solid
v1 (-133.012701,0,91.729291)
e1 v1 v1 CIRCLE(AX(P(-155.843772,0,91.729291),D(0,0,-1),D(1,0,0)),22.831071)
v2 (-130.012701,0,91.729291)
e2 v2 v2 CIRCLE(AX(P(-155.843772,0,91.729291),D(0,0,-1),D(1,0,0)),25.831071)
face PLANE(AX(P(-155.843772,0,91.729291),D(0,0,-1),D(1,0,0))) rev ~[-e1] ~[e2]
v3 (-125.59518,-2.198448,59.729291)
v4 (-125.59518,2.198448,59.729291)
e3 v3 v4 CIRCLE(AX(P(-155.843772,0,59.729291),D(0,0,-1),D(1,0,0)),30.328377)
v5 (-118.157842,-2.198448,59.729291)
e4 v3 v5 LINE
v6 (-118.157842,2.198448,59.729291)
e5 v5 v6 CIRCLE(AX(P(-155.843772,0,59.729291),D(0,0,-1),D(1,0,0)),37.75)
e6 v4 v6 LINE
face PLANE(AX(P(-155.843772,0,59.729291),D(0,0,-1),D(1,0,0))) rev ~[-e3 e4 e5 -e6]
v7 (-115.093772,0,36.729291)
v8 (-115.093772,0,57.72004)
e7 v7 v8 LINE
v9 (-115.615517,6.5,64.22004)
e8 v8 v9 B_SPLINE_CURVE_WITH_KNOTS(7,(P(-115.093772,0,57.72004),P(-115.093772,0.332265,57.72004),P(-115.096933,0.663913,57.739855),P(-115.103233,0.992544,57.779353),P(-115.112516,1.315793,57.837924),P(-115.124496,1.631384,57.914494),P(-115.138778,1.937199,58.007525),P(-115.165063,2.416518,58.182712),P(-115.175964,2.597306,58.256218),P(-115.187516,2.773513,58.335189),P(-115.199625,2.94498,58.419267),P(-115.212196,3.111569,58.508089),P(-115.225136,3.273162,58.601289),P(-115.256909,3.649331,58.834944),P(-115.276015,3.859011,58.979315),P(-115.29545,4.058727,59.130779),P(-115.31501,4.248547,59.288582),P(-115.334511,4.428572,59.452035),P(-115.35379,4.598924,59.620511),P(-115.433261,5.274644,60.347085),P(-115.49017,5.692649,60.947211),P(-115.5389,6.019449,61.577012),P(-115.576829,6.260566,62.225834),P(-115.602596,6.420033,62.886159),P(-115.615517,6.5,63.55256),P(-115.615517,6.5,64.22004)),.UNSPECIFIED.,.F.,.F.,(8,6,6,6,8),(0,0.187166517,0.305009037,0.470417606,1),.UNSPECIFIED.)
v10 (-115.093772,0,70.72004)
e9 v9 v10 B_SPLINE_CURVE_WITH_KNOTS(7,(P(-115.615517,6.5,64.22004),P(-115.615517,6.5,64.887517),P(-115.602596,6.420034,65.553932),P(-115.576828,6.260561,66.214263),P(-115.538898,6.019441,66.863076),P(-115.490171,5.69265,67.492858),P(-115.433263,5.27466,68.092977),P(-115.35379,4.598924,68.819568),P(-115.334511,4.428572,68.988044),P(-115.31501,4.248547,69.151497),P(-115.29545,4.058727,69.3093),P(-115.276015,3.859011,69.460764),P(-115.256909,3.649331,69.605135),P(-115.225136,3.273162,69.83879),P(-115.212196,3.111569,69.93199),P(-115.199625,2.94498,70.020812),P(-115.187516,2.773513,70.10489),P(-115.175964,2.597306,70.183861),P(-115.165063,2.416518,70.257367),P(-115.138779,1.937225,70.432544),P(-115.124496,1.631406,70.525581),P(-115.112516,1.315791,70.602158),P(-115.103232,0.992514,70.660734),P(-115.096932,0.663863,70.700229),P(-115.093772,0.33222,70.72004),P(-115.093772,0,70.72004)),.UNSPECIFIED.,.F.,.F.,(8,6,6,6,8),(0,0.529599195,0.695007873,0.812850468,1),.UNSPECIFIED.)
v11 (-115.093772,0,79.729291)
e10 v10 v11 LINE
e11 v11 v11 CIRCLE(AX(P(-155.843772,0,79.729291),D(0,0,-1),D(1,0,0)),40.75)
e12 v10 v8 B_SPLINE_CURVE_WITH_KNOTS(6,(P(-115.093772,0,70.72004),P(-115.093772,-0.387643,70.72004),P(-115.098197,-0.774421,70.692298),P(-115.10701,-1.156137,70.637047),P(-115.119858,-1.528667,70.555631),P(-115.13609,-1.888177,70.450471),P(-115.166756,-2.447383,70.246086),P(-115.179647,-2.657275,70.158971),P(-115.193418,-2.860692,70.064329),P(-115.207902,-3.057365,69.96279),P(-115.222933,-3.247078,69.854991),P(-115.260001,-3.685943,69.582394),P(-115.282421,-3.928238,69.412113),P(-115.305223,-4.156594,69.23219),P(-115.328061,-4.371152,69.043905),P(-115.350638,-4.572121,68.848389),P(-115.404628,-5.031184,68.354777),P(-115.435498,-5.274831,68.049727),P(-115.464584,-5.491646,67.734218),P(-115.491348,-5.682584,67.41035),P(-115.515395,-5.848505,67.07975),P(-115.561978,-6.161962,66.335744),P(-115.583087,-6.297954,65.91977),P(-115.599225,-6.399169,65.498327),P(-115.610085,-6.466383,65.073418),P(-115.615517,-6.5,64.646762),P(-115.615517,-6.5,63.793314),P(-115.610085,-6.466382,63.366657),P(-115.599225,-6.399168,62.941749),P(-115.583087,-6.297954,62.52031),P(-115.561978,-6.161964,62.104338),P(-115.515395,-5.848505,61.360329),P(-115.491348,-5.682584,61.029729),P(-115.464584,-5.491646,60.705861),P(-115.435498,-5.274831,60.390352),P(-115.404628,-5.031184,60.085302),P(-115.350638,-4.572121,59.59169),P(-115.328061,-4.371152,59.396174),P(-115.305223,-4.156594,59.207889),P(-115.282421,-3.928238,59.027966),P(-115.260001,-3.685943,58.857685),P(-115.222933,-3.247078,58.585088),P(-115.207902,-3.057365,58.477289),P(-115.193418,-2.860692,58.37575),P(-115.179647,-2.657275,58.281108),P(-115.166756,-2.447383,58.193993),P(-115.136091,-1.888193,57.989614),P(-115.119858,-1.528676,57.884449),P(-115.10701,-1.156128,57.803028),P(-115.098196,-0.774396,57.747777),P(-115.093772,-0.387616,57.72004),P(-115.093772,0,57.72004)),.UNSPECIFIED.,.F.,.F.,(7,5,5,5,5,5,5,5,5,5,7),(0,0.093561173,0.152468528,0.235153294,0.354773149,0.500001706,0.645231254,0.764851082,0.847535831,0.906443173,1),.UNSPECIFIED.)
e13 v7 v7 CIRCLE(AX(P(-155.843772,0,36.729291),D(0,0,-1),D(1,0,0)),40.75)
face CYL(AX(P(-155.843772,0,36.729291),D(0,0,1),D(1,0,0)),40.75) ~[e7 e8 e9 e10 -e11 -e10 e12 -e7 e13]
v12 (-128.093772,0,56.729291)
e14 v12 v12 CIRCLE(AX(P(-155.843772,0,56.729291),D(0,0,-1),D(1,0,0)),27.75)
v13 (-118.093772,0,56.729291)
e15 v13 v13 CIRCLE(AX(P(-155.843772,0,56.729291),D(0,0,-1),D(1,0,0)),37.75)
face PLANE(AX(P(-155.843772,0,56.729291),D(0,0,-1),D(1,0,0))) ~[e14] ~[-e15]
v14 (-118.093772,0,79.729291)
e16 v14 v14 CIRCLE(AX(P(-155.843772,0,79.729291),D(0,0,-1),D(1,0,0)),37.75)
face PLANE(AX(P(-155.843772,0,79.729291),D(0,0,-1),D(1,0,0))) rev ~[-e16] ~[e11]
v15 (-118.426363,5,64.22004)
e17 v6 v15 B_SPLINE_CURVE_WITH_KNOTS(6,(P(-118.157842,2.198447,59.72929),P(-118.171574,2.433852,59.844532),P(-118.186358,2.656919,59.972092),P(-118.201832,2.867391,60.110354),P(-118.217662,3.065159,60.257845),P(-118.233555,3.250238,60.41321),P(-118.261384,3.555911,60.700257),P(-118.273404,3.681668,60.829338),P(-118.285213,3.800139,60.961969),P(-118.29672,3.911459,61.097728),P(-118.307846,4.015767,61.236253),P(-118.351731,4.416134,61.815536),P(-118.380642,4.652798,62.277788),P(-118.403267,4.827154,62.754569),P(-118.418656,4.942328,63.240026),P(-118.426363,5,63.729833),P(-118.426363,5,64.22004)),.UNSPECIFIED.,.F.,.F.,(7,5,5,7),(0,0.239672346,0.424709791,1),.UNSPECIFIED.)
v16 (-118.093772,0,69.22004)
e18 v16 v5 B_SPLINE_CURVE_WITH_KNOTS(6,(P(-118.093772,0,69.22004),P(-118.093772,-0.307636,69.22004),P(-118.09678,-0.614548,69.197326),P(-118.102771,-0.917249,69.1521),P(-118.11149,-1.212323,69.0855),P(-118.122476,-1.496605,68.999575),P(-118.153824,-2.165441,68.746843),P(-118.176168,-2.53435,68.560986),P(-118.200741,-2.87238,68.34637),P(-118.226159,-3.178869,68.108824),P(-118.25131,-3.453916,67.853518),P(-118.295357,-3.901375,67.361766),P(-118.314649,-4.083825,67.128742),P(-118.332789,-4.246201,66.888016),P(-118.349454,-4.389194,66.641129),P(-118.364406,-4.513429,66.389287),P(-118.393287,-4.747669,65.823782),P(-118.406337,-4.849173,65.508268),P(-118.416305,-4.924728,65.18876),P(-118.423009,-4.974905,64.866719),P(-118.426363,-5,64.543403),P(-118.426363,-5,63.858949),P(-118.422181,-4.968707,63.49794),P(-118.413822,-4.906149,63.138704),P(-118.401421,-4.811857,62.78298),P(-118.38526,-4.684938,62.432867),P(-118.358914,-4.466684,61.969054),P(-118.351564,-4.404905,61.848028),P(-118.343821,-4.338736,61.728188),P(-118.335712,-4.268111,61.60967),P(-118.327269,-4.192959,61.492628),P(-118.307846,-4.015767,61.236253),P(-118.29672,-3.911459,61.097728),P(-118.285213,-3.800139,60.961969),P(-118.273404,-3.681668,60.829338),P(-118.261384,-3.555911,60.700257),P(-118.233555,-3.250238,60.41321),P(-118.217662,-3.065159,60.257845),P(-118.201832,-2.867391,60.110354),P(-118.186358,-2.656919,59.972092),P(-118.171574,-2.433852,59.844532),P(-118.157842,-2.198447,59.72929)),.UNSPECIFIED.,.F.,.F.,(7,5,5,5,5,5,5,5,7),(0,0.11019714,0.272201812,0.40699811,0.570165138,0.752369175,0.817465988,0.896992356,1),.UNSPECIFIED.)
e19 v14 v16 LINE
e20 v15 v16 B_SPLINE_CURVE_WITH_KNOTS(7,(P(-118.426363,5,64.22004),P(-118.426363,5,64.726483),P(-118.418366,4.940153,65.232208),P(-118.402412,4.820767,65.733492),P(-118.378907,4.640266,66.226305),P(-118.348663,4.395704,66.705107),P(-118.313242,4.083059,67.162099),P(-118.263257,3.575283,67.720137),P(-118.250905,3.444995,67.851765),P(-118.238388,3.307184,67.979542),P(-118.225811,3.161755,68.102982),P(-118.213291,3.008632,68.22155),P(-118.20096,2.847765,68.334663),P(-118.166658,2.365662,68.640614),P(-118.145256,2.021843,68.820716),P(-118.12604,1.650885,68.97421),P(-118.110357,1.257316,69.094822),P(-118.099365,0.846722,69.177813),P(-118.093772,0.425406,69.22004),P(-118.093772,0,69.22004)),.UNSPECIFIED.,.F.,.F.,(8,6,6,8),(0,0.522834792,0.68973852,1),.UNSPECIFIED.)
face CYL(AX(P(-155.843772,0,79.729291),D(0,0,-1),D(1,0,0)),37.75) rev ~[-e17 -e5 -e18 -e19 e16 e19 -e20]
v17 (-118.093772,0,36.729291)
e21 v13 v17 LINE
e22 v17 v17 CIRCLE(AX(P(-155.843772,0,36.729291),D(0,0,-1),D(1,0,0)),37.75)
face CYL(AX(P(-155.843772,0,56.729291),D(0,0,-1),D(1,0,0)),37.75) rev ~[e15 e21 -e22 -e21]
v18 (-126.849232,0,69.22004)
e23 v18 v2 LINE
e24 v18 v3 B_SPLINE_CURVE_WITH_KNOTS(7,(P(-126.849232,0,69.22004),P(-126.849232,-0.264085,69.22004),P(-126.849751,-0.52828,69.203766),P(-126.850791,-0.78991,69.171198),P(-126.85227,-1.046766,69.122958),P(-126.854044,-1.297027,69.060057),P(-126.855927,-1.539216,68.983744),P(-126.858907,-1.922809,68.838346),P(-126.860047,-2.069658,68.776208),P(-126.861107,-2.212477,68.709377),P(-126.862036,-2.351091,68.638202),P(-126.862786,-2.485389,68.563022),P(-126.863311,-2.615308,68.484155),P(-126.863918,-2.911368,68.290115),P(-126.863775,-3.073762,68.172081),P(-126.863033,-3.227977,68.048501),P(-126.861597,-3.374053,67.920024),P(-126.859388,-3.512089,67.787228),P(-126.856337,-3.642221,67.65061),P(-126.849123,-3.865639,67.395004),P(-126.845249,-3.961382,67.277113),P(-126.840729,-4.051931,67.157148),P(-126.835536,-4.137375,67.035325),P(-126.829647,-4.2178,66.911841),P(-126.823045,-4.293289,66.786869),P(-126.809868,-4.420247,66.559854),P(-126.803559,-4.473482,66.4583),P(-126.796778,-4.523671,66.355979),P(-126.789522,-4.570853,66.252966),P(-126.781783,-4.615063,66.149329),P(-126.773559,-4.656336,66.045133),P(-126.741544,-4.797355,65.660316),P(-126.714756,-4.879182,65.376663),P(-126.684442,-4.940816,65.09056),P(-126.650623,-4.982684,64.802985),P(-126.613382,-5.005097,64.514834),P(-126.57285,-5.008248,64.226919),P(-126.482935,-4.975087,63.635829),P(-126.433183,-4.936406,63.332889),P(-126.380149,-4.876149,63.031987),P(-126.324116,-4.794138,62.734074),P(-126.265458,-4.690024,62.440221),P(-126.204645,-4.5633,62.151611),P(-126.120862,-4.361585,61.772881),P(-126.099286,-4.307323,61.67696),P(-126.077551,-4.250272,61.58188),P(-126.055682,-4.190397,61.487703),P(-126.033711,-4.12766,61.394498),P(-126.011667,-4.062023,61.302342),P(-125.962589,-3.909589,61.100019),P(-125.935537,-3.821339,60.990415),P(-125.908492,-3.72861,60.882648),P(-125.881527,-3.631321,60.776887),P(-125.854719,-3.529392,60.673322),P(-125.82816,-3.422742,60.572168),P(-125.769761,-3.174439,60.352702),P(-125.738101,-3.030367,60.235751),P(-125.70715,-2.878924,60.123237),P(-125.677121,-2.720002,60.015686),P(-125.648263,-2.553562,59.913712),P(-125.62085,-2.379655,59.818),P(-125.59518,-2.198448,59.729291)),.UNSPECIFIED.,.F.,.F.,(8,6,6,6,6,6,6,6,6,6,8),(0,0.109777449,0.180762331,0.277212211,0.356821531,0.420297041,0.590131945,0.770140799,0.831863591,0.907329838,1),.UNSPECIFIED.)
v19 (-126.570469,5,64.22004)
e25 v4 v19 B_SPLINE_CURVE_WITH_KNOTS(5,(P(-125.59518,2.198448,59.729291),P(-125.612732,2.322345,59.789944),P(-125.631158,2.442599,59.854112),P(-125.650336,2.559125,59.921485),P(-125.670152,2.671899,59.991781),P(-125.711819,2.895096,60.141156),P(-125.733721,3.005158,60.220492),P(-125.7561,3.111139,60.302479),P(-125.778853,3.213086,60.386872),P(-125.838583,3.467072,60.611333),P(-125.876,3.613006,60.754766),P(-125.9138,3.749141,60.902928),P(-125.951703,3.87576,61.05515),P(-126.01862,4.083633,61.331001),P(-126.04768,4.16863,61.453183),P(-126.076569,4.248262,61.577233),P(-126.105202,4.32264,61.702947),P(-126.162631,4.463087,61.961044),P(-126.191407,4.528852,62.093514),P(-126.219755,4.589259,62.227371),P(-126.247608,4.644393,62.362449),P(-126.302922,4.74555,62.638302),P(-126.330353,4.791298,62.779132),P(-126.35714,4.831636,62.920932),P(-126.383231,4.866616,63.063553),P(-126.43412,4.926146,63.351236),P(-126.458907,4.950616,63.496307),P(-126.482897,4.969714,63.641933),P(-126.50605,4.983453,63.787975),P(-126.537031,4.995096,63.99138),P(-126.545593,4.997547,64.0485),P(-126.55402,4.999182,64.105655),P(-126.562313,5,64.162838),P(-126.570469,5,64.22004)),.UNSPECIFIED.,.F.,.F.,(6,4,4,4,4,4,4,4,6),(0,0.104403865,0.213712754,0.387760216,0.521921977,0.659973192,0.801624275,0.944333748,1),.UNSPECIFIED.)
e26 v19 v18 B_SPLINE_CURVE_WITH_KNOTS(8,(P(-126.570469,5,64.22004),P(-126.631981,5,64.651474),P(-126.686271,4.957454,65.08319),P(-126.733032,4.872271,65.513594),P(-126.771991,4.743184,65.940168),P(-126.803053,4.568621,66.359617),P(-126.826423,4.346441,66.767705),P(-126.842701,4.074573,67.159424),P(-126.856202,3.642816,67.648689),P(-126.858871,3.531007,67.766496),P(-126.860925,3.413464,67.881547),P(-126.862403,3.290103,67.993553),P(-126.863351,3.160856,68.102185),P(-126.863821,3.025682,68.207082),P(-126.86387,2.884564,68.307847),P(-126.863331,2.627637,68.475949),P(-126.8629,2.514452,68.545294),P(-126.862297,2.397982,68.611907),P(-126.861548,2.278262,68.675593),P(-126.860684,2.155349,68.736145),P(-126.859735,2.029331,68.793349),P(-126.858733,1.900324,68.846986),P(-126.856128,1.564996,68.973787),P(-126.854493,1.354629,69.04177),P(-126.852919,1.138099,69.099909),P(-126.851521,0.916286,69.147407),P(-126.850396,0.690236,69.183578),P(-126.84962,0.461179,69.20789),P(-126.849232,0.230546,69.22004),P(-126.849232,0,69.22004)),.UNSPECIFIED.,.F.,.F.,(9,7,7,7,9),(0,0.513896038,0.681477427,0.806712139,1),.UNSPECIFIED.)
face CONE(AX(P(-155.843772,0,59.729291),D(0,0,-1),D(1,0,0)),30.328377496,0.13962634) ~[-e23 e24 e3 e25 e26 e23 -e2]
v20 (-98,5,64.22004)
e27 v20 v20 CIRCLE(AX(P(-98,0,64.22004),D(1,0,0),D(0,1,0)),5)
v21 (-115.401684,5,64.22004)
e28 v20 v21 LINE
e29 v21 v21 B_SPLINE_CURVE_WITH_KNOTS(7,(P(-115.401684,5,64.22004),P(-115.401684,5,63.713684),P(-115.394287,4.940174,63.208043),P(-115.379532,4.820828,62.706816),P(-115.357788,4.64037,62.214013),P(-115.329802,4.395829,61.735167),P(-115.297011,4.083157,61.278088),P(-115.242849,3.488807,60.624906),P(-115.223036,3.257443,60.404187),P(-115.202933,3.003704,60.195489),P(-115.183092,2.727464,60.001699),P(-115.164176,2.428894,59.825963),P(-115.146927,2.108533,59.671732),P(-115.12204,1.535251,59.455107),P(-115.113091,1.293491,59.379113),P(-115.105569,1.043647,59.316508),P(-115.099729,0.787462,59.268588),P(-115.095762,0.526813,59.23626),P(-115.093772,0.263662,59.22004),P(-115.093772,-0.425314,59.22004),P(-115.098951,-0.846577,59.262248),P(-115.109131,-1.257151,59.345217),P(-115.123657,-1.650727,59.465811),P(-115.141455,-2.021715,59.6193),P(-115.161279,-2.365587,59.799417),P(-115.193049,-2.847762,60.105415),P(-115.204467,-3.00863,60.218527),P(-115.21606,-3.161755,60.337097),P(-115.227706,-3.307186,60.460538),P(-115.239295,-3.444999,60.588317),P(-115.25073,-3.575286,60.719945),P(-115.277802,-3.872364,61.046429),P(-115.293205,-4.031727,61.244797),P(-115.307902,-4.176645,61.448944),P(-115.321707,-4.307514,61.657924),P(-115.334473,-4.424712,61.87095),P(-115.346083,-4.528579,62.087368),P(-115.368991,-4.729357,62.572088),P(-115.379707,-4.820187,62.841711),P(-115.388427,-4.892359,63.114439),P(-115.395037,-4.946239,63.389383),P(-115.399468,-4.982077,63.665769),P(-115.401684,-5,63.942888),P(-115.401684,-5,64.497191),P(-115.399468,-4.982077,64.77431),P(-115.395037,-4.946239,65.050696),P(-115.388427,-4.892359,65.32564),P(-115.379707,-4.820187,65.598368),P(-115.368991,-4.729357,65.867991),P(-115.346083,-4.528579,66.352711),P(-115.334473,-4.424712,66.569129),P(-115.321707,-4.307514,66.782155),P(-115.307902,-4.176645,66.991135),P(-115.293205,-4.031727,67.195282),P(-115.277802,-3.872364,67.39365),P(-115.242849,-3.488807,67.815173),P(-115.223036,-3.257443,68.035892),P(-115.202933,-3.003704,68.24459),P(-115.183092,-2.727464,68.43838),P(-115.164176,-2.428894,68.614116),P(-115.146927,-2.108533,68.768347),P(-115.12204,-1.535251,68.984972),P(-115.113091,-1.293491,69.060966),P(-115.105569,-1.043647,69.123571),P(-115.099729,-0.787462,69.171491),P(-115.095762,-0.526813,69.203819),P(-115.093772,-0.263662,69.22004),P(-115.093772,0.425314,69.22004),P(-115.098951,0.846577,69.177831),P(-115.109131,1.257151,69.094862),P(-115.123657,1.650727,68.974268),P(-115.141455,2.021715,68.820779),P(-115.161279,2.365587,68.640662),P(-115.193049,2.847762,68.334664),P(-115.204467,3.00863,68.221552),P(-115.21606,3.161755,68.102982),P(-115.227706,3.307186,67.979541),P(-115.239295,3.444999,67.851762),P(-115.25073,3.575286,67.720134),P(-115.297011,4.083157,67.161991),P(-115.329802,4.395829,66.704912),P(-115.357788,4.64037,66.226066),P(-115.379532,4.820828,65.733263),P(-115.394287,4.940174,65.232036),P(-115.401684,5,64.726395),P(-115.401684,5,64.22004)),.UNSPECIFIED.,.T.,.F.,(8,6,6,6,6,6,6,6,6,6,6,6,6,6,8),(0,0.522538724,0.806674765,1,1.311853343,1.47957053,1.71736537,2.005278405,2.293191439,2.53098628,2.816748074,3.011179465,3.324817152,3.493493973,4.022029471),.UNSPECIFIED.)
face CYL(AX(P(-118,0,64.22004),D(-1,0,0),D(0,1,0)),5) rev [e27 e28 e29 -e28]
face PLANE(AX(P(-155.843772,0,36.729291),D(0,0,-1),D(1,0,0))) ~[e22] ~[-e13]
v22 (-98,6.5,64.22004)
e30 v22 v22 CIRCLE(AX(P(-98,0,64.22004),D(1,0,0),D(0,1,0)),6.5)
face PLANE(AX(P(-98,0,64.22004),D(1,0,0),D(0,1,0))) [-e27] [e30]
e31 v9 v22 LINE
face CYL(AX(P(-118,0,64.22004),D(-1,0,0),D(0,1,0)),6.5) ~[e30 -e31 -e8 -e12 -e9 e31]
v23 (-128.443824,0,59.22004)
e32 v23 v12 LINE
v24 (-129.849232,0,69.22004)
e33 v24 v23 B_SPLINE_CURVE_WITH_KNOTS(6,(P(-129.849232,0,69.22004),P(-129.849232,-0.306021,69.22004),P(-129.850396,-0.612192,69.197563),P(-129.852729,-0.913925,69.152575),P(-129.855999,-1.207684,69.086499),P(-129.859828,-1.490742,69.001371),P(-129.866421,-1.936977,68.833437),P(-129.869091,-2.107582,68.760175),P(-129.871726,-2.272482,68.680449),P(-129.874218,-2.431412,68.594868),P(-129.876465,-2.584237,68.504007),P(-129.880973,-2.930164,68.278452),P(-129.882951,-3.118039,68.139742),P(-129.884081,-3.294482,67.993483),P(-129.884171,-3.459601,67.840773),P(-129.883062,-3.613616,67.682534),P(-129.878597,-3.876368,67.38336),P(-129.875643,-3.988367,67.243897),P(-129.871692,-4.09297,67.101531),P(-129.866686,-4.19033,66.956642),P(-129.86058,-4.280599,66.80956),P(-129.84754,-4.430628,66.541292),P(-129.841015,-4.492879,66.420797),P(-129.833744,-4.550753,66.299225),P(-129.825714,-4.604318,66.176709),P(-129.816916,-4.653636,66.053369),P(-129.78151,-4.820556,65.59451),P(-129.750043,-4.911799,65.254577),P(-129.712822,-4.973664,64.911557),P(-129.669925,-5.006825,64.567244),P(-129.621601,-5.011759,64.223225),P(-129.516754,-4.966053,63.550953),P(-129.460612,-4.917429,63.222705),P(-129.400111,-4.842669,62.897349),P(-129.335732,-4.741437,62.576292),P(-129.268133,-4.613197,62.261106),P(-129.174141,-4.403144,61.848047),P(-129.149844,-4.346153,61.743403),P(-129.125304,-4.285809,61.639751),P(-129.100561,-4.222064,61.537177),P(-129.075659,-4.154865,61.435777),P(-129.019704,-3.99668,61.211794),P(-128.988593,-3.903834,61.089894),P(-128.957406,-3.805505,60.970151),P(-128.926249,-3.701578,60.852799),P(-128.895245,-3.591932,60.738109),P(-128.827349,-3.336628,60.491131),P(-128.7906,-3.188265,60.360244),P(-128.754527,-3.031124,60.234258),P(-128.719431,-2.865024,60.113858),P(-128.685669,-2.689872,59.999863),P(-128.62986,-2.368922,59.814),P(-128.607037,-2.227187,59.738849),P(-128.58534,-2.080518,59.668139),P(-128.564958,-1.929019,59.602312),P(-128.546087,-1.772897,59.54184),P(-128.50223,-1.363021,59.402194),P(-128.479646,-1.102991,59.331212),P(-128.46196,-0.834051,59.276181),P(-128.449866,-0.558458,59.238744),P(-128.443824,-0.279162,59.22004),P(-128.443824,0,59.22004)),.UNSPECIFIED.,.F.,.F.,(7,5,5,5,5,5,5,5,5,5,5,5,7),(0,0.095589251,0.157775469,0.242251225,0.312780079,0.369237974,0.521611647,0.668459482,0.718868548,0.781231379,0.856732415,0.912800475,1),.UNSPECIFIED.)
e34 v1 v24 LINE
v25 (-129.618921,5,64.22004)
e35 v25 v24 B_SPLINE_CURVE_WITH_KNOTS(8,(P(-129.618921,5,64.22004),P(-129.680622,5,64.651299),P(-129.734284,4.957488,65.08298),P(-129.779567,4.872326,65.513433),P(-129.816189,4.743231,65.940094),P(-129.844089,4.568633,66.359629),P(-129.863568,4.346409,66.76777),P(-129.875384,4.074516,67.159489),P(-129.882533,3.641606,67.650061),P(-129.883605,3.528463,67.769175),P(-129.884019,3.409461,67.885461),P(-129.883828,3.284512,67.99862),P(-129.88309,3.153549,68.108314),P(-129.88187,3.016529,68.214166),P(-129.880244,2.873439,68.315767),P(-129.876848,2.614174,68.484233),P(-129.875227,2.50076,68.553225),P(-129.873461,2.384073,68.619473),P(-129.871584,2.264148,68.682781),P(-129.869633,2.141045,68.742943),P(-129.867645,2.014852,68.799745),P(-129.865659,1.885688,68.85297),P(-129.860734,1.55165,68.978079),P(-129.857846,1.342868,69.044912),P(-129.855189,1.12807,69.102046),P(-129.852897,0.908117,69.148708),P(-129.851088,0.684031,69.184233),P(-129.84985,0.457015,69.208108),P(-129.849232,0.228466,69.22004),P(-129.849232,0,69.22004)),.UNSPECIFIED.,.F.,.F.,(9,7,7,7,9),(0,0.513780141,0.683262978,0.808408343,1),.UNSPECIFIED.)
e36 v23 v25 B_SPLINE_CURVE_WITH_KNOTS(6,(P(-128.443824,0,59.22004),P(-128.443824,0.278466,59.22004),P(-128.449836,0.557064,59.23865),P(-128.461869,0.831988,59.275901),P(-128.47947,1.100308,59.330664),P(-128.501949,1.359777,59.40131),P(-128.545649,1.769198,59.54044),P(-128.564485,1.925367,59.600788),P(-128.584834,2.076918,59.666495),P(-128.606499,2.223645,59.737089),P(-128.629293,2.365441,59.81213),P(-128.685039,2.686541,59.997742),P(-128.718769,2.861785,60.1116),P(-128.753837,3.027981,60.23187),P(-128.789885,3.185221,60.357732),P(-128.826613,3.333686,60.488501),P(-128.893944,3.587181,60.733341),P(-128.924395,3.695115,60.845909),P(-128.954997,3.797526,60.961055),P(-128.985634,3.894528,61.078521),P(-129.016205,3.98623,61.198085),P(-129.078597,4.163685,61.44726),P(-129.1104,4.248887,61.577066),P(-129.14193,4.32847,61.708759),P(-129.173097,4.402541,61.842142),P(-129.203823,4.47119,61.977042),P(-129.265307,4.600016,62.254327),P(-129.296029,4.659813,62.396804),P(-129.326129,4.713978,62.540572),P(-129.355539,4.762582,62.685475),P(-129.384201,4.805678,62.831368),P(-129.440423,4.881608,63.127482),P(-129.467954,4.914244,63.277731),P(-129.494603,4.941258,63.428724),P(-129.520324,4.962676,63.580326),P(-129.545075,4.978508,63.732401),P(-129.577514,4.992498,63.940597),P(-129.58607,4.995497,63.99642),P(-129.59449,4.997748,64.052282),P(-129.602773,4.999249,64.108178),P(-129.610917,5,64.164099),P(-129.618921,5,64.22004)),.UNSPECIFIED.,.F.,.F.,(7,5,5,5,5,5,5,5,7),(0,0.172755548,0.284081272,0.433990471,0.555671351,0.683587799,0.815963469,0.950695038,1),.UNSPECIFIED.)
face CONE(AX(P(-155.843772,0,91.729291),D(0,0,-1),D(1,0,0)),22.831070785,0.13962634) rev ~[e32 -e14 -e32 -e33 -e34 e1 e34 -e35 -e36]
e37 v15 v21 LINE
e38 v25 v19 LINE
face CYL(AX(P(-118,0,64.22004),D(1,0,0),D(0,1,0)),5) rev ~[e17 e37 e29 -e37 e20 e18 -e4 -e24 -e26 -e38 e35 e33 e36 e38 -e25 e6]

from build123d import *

# Parameters (mm, degrees)
F3_R     = 6.5
F3_R_2   = 5
F4_DEPTH = 20
F5_DEPTH = 14.3


with BuildPart() as f1:
    # F0 (on Front) → F1 (revolve)
    with BuildSketch(Plane.XZ):
        Polygon((-130.0127011951, 91.7292905117), (-133.0127011951, 91.7292905117), (-128.0937719805, 56.7292905117), (-118.0937719805, 56.7292905117), (-118.0937719805, 36.7292905117), (-115.0937719805, 36.7292905117), (-115.0937719805, 79.7292905117), (-118.0937719805, 79.7292905117), (-118.0937719805, 59.7292905117), (-125.5153944847, 59.7292905117), align=None)
    revolve(axis=Axis((-155.8437719805, 0, 54.1304184761), (0, 0, -1)))

    # F3 (on offset) → F4 (join)
    with BuildSketch(Plane.YZ.offset(-118)):
        with Locations((0, 64.2200395022)):
            Circle(F3_R)
        with Locations((0, 64.2200395022)):
            Circle(F3_R_2, mode=Mode.SUBTRACT)
    extrude(amount=F4_DEPTH)

    # F3 (on offset) → F5 (cut, symmetric)
    with BuildSketch(Plane.YZ.offset(-118)):
        with Locations((0, 64.2200395022)):
            Circle(F3_R_2)
    extrude(amount=F5_DEPTH, both=True, mode=Mode.SUBTRACT)


solid = f1.part
